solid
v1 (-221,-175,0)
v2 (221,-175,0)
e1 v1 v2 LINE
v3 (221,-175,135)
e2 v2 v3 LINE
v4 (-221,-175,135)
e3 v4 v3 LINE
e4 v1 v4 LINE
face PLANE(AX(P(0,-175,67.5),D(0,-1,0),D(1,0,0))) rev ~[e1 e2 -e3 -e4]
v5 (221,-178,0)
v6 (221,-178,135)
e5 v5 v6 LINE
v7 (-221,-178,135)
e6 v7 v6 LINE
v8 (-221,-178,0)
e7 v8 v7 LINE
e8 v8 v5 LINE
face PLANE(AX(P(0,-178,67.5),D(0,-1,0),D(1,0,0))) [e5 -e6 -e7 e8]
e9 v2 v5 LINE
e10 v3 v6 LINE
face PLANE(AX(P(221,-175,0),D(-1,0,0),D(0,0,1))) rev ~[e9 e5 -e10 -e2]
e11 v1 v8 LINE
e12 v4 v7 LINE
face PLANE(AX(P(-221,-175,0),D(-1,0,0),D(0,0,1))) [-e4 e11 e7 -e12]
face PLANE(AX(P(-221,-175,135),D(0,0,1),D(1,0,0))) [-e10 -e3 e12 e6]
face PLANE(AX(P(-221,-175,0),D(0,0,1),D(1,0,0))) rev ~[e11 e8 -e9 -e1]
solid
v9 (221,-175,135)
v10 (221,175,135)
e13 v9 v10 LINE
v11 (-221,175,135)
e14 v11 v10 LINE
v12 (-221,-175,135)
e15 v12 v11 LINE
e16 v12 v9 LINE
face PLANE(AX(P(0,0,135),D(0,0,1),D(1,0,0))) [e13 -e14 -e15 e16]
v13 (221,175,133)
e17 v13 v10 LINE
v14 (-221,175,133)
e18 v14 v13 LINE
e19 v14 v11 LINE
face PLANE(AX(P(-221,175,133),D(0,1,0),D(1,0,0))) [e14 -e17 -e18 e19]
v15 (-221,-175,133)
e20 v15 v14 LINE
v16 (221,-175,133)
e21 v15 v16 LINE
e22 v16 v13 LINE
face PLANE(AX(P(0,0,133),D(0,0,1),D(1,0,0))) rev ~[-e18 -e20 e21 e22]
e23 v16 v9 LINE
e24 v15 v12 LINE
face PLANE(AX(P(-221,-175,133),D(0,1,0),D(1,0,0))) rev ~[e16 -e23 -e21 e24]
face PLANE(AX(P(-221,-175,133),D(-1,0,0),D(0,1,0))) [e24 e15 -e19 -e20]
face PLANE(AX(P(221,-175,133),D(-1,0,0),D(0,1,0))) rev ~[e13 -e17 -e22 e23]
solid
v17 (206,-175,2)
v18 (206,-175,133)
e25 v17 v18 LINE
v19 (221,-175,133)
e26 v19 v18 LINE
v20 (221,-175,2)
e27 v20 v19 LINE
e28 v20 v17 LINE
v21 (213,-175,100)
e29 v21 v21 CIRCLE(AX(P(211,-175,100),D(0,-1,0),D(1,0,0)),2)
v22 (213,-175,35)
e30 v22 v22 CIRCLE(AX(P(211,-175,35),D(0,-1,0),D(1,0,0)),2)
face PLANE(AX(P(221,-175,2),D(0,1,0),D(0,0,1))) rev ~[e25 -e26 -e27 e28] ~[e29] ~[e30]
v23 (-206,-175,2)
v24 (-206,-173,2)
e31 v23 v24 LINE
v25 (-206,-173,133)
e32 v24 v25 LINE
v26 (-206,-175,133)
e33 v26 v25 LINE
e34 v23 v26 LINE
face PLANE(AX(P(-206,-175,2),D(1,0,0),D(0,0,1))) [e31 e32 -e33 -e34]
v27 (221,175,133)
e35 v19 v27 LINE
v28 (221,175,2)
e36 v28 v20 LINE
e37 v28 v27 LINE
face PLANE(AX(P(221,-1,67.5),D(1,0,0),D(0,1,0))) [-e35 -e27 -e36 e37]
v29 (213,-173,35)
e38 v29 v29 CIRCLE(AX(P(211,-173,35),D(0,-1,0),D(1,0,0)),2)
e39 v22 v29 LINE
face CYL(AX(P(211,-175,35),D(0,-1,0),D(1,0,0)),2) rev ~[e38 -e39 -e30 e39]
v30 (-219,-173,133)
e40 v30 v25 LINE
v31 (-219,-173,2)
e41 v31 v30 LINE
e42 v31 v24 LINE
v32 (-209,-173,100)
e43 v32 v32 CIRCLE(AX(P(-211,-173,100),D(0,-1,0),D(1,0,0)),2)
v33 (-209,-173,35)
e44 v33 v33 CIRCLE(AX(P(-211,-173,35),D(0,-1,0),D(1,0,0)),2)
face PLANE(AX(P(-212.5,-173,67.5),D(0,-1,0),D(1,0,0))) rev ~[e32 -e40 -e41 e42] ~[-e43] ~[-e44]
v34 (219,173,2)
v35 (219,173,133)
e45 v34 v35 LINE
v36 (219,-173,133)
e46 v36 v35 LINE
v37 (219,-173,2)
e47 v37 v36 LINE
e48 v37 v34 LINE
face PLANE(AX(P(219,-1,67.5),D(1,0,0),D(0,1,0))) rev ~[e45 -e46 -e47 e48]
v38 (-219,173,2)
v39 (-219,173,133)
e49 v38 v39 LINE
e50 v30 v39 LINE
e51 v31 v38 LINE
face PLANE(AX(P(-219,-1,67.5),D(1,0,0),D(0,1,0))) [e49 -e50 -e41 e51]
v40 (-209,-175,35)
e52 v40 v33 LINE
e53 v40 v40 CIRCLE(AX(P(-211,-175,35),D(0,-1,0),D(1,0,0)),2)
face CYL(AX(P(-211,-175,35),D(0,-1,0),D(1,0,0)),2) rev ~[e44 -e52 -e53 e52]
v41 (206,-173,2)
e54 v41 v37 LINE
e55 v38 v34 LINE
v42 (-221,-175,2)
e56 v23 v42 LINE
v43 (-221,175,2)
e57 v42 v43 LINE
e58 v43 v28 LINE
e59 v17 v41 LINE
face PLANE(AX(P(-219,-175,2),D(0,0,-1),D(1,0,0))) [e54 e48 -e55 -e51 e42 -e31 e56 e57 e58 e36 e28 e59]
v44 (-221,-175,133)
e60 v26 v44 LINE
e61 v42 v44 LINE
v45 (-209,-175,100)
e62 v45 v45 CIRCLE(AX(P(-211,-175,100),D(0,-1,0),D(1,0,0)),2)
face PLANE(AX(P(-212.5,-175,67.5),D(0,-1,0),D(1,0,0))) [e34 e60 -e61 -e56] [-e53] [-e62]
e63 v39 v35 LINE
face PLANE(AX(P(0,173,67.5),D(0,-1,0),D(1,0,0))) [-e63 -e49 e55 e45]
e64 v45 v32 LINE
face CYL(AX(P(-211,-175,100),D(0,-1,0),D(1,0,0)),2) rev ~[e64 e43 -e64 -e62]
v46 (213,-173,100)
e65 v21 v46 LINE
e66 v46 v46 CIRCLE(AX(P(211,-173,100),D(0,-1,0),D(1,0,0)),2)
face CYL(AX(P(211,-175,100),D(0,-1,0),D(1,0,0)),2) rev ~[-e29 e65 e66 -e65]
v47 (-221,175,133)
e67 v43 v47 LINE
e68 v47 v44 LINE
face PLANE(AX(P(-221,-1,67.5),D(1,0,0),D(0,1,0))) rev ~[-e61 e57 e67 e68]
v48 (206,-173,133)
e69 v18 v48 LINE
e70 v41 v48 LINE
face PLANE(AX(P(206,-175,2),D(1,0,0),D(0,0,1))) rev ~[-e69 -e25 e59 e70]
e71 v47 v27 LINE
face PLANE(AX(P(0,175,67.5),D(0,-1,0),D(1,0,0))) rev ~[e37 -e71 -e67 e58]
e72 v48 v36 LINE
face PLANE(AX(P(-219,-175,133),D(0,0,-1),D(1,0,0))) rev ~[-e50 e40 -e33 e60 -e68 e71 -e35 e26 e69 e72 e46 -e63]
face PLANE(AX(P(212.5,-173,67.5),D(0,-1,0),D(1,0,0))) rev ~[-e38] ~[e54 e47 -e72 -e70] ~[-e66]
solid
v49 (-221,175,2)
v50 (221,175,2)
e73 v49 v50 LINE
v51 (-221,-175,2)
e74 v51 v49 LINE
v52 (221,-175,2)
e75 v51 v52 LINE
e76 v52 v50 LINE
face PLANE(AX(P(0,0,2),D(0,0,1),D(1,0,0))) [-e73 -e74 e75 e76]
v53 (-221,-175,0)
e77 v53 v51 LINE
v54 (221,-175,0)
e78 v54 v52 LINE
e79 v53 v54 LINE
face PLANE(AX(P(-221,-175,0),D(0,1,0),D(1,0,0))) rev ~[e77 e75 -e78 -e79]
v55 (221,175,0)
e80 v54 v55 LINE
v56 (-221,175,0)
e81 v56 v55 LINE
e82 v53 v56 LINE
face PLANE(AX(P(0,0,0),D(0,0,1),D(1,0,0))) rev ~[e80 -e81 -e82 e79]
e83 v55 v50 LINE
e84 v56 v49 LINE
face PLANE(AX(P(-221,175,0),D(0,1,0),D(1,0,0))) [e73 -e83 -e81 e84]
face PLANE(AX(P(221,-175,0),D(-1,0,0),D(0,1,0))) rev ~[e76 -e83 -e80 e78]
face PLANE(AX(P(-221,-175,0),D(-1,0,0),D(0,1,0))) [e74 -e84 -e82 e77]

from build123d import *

# Parameters (mm, degrees)
F4_W      = 442
F4_H      = 350
F7_DEPTH  = 2
F0_W      = 442
F0_H      = 350
F8_DEPTH  = 2
F9_W      = 442
F9_H      = 131
F10_DEPTH = 2
F11_W     = 348
F11_H     = 131
F12_DEPTH = 2
F13_W     = 348
F13_H     = 131
F14_DEPTH = 2
F15_W     = 13
F15_H     = 131
F15_R     = 2
F16_DEPTH = 2
F17_W     = 442
F17_H     = 135
F18_DEPTH = 3


with BuildPart() as f7:
    # F4 (on offset) → F7 (new body)
    with BuildSketch(Plane.XY.offset(133)):
        Rectangle(F4_W, F4_H)
    extrude(amount=F7_DEPTH)


with BuildPart() as f8:
    # F0 (on Top) → F8 (new body)
    with BuildSketch(Plane.XY):
        Rectangle(F0_W, F0_H)
    extrude(amount=F8_DEPTH)


with BuildPart() as f10:
    # F9 (on offset) → F10 (new body)
    with BuildSketch(Plane.XZ.offset(-175)):
        with Locations((0, 67.5)):
            Rectangle(F9_W, F9_H)
    extrude(amount=F10_DEPTH)

    # F11 (on offset) → F12 (join)
    with BuildSketch(Plane.YZ.offset(-221)):
        with Locations((-1, 67.5)):
            Rectangle(F11_W, F11_H)
    extrude(amount=F12_DEPTH)

    # F13 (on offset) → F14 (join)
    with BuildSketch(Plane.YZ.offset(221)):
        with Locations((-1, 67.5)):
            Rectangle(F13_W, F13_H)
    extrude(amount=-F14_DEPTH)

    # F15 (on offset) → F16 (join)
    with BuildSketch(Plane.XZ.offset(175)):
        with Locations((-212.5, 67.5)):
            Rectangle(F15_W, F15_H)
        with Locations((-211, 35)):
            Circle(F15_R, mode=Mode.SUBTRACT)
        with Locations((-211, 100)):
            Circle(F15_R, mode=Mode.SUBTRACT)
        with Locations((212.5, 67.5)):
            Rectangle(F15_W, F15_H)
        with Locations((211, 35)):
            Circle(F15_R, mode=Mode.SUBTRACT)
        with Locations((211, 100)):
            Circle(F15_R, mode=Mode.SUBTRACT)
    extrude(amount=-F16_DEPTH)


with BuildPart() as f18:
    # F17 (on offset) → F18 (new body)
    with BuildSketch(Plane.XZ.offset(175)):
        with Locations((0, 67.5)):
            Rectangle(F17_W, F17_H)
    extrude(amount=F18_DEPTH)


solid = Compound([f7.part, f8.part, f10.part, f18.part])
